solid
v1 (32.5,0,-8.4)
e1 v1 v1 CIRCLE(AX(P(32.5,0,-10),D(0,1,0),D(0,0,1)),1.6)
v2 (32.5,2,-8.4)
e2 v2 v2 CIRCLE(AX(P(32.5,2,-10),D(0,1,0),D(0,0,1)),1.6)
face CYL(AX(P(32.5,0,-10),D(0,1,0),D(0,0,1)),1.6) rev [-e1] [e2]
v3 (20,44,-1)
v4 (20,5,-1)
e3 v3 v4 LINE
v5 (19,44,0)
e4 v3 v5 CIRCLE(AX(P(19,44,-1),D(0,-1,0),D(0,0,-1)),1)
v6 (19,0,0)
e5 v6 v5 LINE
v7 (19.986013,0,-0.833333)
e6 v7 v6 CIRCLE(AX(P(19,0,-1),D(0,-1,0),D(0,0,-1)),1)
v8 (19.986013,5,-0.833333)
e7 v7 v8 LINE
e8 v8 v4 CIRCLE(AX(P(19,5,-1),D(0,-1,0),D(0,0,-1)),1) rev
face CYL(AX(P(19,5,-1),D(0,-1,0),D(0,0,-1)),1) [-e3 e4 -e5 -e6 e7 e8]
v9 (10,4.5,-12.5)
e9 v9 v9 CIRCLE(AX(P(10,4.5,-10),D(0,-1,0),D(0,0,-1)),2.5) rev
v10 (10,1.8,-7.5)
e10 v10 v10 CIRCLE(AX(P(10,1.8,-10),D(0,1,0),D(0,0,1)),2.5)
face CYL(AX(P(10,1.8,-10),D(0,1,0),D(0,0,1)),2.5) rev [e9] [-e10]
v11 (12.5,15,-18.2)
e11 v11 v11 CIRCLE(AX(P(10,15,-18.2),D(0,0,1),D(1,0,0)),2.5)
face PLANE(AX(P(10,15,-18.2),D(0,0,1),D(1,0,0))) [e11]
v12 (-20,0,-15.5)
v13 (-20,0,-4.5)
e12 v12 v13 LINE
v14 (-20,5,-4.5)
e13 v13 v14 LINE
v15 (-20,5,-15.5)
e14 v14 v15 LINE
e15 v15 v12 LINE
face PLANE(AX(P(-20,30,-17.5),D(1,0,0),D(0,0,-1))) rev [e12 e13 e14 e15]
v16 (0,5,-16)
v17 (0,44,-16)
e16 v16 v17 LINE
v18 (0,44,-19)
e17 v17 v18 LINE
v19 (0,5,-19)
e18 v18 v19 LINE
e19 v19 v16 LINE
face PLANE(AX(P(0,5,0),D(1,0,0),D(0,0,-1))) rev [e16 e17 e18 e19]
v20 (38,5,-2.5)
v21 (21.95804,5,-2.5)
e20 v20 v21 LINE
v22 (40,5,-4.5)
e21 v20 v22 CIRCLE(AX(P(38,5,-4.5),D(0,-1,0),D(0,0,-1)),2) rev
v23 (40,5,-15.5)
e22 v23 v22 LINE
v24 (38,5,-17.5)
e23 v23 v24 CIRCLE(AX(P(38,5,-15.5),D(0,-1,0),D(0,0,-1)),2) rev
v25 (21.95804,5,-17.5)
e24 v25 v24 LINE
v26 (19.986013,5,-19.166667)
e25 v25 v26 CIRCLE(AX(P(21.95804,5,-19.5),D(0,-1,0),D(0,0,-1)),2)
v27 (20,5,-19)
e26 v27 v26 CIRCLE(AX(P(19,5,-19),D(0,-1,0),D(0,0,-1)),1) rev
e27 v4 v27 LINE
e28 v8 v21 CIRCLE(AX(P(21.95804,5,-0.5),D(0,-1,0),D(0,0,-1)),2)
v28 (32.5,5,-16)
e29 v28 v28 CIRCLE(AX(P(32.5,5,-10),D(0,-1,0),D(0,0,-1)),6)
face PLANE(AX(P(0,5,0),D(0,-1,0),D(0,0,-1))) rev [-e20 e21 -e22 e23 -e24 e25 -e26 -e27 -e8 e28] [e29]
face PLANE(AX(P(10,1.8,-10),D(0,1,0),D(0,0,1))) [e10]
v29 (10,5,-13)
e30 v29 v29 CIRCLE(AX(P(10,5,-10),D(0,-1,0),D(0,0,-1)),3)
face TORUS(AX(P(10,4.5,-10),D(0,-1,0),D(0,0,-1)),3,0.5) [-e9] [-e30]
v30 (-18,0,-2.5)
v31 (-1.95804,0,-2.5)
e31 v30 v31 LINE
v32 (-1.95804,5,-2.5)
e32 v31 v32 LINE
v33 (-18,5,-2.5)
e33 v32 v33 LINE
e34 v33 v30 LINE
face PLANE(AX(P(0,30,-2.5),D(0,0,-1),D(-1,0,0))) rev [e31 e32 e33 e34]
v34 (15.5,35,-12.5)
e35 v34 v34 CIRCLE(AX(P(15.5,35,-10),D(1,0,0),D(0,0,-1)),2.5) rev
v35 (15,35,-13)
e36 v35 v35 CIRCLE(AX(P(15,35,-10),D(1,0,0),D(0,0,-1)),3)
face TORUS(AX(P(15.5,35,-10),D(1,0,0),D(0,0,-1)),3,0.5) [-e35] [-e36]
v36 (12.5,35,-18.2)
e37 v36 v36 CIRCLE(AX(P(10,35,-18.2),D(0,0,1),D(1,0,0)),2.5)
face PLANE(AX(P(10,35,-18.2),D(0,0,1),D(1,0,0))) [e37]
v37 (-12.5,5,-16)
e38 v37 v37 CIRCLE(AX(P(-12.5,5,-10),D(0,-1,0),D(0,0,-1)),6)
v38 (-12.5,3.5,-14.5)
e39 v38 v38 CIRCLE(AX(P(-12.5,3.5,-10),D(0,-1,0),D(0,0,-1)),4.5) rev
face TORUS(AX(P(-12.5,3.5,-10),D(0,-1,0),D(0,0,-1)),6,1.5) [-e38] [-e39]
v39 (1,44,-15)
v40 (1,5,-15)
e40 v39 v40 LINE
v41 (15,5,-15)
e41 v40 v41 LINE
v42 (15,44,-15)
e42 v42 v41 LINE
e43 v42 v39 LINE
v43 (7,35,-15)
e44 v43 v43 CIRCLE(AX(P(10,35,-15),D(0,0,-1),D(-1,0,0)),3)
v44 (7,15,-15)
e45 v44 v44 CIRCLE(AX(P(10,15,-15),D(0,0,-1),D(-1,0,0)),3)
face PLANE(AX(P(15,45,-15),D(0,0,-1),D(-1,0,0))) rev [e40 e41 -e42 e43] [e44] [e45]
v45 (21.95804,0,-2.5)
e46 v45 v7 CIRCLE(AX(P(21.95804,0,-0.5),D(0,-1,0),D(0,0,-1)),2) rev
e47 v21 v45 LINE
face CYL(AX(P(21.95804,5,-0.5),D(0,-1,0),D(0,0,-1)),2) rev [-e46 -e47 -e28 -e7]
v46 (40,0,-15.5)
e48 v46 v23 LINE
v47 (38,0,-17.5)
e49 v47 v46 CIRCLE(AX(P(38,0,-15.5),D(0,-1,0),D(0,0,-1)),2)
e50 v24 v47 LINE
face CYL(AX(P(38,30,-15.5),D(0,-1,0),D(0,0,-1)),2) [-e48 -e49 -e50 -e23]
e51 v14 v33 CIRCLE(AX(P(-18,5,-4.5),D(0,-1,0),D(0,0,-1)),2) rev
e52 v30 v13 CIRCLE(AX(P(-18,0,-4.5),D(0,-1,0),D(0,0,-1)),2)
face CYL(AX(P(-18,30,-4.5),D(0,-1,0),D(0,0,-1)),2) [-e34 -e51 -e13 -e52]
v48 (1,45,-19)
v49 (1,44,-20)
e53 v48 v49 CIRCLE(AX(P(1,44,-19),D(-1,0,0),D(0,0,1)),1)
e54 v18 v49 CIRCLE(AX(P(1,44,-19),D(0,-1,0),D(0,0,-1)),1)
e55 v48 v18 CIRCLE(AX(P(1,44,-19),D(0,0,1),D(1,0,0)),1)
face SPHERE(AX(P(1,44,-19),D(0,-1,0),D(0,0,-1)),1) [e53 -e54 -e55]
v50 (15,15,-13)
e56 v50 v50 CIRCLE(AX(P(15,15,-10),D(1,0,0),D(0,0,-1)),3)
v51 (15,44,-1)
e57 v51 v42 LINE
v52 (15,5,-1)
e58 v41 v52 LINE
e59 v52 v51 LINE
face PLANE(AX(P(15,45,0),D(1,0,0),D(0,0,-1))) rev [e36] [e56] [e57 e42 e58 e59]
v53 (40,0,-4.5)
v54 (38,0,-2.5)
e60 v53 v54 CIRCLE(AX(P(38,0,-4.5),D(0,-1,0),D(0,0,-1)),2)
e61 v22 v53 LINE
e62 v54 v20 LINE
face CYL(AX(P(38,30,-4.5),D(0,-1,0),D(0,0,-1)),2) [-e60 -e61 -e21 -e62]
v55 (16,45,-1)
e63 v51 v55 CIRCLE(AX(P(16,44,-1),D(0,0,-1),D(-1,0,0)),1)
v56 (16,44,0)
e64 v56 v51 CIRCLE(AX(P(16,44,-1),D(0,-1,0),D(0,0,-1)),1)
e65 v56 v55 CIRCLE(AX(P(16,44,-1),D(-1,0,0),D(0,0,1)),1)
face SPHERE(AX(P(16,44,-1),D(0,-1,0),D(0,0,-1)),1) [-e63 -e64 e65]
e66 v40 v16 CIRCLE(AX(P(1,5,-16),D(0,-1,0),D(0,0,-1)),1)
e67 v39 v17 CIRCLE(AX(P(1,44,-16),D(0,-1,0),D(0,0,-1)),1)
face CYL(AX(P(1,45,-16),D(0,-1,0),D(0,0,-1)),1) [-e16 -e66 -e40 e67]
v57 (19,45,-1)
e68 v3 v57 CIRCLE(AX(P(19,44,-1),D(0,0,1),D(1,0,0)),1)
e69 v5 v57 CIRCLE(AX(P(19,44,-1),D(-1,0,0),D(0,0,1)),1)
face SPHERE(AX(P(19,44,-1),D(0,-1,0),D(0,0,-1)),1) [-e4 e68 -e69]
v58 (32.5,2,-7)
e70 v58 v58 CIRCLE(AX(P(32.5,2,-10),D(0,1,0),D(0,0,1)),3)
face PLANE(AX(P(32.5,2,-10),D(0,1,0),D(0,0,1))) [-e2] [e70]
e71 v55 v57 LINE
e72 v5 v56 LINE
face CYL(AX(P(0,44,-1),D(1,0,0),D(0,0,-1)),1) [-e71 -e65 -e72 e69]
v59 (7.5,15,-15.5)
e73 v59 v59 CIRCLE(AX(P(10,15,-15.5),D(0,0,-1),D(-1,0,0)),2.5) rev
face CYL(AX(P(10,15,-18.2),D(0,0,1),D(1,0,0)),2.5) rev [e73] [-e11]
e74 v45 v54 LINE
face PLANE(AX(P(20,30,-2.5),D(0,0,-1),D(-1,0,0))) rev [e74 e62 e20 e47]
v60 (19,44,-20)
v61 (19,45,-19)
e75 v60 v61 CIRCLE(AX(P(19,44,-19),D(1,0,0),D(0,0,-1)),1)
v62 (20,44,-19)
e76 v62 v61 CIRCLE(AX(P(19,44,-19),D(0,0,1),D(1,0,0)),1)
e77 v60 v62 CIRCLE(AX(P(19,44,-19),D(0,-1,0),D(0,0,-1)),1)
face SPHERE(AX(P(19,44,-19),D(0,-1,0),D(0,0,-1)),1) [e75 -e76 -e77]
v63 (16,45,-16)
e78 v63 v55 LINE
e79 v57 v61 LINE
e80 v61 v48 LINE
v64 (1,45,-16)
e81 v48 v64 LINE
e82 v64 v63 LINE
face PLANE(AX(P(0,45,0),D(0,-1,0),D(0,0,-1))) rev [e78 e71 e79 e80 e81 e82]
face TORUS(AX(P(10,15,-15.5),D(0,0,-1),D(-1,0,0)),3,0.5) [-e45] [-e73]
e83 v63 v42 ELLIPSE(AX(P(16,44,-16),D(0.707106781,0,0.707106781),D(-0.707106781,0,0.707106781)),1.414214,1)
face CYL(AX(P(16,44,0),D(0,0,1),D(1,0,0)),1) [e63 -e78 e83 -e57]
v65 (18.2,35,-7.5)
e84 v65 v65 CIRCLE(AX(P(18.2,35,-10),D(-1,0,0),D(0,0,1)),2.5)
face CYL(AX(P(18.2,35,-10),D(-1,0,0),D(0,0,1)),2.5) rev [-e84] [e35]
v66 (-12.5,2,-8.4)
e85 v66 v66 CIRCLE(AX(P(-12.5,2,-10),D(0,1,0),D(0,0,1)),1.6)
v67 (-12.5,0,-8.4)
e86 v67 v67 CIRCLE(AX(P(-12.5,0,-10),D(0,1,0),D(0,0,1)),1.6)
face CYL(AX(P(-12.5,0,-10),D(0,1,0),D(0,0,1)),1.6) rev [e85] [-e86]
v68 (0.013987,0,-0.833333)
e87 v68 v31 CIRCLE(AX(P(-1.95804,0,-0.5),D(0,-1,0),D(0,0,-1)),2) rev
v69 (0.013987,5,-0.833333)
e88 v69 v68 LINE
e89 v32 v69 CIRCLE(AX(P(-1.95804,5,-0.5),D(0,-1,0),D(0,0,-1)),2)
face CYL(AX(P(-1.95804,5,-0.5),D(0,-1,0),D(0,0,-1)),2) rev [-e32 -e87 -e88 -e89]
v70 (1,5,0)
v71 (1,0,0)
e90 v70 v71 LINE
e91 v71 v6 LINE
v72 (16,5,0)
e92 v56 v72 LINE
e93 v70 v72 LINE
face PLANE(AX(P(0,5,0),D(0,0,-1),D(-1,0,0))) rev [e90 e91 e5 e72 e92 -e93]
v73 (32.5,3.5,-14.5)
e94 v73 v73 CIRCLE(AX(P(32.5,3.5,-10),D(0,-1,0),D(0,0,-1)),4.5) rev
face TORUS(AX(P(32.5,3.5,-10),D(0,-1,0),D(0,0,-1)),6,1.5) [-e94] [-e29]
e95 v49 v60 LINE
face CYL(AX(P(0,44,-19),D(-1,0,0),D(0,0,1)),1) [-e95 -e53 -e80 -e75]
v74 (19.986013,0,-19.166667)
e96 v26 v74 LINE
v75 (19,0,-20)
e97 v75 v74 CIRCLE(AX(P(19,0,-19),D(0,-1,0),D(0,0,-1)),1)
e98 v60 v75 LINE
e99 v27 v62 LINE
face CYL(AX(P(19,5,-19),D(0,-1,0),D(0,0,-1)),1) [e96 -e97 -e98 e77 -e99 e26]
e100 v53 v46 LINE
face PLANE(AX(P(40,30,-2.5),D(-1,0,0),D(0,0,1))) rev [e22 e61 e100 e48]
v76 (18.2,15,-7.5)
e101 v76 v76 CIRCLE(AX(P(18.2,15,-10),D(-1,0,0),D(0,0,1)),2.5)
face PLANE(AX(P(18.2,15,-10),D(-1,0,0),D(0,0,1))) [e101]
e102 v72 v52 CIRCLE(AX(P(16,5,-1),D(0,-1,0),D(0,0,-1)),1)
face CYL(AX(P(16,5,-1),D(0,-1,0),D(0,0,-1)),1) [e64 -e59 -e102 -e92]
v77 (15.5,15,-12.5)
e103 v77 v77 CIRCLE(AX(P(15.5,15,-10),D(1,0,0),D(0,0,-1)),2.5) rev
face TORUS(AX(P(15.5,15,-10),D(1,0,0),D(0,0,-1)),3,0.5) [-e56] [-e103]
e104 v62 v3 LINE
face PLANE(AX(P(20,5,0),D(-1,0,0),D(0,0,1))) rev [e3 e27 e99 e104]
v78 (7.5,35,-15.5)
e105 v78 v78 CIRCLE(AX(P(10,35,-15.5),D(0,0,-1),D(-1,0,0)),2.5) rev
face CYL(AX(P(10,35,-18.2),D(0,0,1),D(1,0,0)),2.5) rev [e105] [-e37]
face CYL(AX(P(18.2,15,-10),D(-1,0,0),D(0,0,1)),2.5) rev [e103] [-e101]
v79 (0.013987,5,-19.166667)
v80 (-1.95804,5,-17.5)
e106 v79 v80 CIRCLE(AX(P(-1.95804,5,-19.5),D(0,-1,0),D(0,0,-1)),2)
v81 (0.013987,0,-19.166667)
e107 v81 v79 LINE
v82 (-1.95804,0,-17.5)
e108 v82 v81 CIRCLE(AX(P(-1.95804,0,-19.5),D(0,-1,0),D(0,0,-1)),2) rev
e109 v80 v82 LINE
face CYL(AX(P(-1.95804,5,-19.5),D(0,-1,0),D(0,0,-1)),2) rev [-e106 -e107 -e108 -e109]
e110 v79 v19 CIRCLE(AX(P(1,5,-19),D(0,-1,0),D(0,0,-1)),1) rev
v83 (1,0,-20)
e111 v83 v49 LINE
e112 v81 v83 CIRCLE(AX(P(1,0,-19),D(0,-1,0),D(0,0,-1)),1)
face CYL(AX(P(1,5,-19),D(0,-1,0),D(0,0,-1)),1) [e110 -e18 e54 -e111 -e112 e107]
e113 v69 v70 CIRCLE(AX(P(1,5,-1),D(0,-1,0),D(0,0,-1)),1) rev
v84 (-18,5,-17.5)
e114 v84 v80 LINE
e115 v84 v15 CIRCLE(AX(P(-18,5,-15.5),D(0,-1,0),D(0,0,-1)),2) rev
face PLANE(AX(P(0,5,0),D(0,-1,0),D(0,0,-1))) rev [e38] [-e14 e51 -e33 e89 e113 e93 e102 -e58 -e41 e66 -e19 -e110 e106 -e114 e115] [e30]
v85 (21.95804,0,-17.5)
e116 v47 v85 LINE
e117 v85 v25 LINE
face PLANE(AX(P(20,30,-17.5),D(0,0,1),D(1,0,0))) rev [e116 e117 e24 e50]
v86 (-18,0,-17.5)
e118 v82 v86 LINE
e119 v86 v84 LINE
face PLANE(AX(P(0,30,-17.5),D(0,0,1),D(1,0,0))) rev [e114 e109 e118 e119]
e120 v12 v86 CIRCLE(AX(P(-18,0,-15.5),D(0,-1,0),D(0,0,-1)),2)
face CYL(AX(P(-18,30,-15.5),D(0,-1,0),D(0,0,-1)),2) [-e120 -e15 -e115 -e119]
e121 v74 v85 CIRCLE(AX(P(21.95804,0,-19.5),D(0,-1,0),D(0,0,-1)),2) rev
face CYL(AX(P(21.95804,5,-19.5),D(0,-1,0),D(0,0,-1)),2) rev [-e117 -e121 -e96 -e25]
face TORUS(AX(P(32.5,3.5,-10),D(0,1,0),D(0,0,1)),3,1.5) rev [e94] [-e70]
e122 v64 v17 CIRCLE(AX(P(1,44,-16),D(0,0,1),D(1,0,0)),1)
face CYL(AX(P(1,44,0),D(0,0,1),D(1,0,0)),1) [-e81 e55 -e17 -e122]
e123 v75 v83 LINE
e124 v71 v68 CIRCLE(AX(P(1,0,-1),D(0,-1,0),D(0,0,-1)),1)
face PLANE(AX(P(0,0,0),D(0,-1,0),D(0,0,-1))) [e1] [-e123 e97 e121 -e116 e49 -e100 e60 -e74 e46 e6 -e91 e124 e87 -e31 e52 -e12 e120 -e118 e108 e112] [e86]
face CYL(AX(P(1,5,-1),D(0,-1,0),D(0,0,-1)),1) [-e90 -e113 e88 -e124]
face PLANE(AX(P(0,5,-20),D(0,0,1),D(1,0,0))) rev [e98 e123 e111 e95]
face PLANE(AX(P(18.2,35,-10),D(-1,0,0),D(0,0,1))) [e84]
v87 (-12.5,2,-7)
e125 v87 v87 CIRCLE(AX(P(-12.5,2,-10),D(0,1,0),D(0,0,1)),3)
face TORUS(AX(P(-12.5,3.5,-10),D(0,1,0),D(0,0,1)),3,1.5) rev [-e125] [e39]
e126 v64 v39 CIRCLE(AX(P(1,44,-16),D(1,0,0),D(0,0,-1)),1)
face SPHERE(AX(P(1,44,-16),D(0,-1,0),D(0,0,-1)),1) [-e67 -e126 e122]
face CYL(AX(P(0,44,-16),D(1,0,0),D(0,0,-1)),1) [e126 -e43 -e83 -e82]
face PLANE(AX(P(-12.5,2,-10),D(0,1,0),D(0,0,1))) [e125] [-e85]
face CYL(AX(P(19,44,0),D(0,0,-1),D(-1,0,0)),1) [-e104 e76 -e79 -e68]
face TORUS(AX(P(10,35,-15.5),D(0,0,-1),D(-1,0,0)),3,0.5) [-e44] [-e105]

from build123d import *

# Parameters (mm, degrees)
SKETCH1_W           = 20
SKETCH1_H           = 20
BOSS_EXTRUDE1_DEPTH = 5
BOSS_EXTRUDE2_DEPTH = 40
FILLET1_R           = 1
FILLET2_R           = 1
SKETCH3_R           = 2.5
CUT_EXTRUDE1_DEPTH  = 3.2
SKETCH4_R           = 2.5
CUT_EXTRUDE2_DEPTH  = 3.2
SKETCH5_R           = 2.5
CUT_EXTRUDE3_DEPTH  = 3.2
FILLET3_R           = 0.5
FILLET4_R           = 1
SKETCH6_W           = 20
SKETCH6_H           = 15
BOSS_EXTRUDE3_DEPTH = 5
FILLET5_R           = 2
FILLET6_R           = 2
SKETCH7_R           = 4.5
CUT_EXTRUDE4_DEPTH  = 3
FILLET7_R           = 1.5
SKETCH8_R           = 1.6
CUT_EXTRUDE5_DEPTH  = 63.040309477


# Some blends are built 0.0001 mm under size
with BuildPart() as part:
    # Sketch1 → Boss-Extrude1 (new body)
    with BuildSketch(Plane(origin=(0, 0, 0), x_dir=(1, 0, 0), z_dir=(0, 1, 0))):
        with Locations((10, 10)):
            Rectangle(SKETCH1_W, SKETCH1_H)
    extrude(amount=BOSS_EXTRUDE1_DEPTH)

    # Sketch2 → Boss-Extrude2 (add)
    with BuildSketch(Plane(origin=(0, 5, 0), x_dir=(1, 0, 0), z_dir=(0, 1, 0))):
        Polygon((0, 20), (20, 20), (20, 0), (15, 0), (15, 15), (0, 15), align=None)
    extrude(amount=BOSS_EXTRUDE2_DEPTH)

    # Fillet1
    fillet1_edges = [part.edges().sort_by_distance(p)[0] for p in [
        (0, 25, -15),
        (15, 25, 0),
        (0, 2.5, 0),
    ]]
    fillet(fillet1_edges, radius=FILLET1_R)

    # Fillet2
    fillet2_edges = [part.edges().sort_by_distance(p)[0] for p in [
        (0, 22.5, -20),
        (20, 22.5, -20),
        (20, 22.5, 0),
    ]]
    fillet(fillet2_edges, radius=FILLET2_R)

    # Sketch3 → Cut-Extrude1 (cut)
    with BuildSketch(Plane(origin=(0, 5, 0), x_dir=(1, 0, 0), z_dir=(0, 1, 0))):
        with Locations(Location((10, 10, 0), (0, 0, 270))):
            Circle(SKETCH3_R)
    extrude(amount=-CUT_EXTRUDE1_DEPTH, mode=Mode.SUBTRACT)

    # Sketch4 → Cut-Extrude2 (cut)
    with BuildSketch(Plane.XY.offset(-15)):
        with Locations((10, 15)):
            Circle(SKETCH4_R)
        with Locations((10, 35)):
            Circle(SKETCH4_R)
    extrude(amount=-CUT_EXTRUDE2_DEPTH, mode=Mode.SUBTRACT)

    # Sketch5 → Cut-Extrude3 (cut)
    with BuildSketch(Plane.ZY.offset(-15)):
        with Locations((-10, 15)):
            Circle(SKETCH5_R)
        with Locations((-10, 35)):
            Circle(SKETCH5_R)
    extrude(amount=-CUT_EXTRUDE3_DEPTH, mode=Mode.SUBTRACT)

    # Fillet3
    fillet3_edges = [part.edges().sort_by_distance(p)[0] for p in [
        (10, 5, -12.5),
        (7.5, 15, -15),
        (7.5, 35, -15),
        (15, 15, -12.5),
        (15, 35, -12.5),
    ]]
    fillet(fillet3_edges, radius=FILLET3_R)

    # Fillet4
    fillet4_edges = [part.edges().sort_by_distance(p)[0] for p in [
        (15, 45, -8),
        (8, 45, -15),
        (17.5, 45, 0),
        (15.292893219, 45, -0.292893219),
        (0.292893219, 45, -15.292893219),
        (10, 45, -20),
        (20, 45, -10),
        (0, 45, -17.5),
        (19.707106781, 45, -0.292893219),
        (0.292893219, 45, -19.707106781),
        (19.707106781, 45, -19.707106781),
    ]]
    fillet(fillet4_edges, radius=FILLET4_R)

    # Sketch6 → Boss-Extrude3 (add)
    with BuildSketch(Plane(origin=(0, 0, 0), x_dir=(1, 0, 0), z_dir=(0, 1, 0))):
        with Locations((-10, 10)):
            Rectangle(SKETCH6_W, SKETCH6_H)
        with Locations((30, 10)):
            Rectangle(SKETCH6_W, SKETCH6_H)
    extrude(amount=BOSS_EXTRUDE3_DEPTH)

    # Fillet5
    # the kernel refuses this fillet: 2 mm, written as the material it adds along each edge
    with BuildSketch(Plane(origin=(0, 0, -17.5), x_dir=(0.00839172619726849, 0, -0.9999647888458023), z_dir=(0, 1, 0)), Plane(origin=(20, 0, -2.5), x_dir=(-0.008391726197268362, 0, 0.9999647888458023), z_dir=(0, 1, 0))) as fillet5_piece_1:
        with BuildLine():
            CenterArc((1.983498243, 1.974754399), FILLET5_R, 180.480816137, 80.405931773)
            Line((-0.016431335, 1.957970947), (-0.216424292, 1.956292601))
            Line((-0.216424292, 1.956292601), (-0.199992958, -0.001678345))
            Line((-0.199992958, -0.001678345), (0.001678345, -0.199992958))
            ThreePointArc((0.001678345, -0.199992958), (1.501625529, -0.187405368), (1.635048065, -0.19747544))
            Line((1.635048065, -0.19747544), (1.666725354, 0))
        make_face()
    extrude(amount=5)
    with BuildSketch(Plane(origin=(0, 0, -2.5), x_dir=(0.00839172619726729, 0, 0.9999647888458023), z_dir=(0, 1, 0)), Plane(origin=(20, 0, -17.5), x_dir=(-0.008391726197268357, 0, -0.9999647888458023), z_dir=(0, 1, 0))) as fillet5_piece_2:
        with BuildLine():
            CenterArc((1.983498243, -1.974754399), FILLET5_R, 99.11325209, 80.405931773)
            Line((-0.016431335, -1.957970947), (-0.216424292, -1.956292601))
            Line((-0.216424292, -1.956292601), (-0.199992958, 0.001678345))
            Line((-0.199992958, 0.001678345), (0.001678345, 0.199992958))
            ThreePointArc((0.001678345, 0.199992958), (1.501625529, 0.187405368), (1.635048065, 0.19747544))
            Line((1.635048065, 0.19747544), (1.666725354, 0))
        make_face()
    extrude(amount=5)

    # Fillet6
    fillet6_edges = [part.edges().sort_by_distance(p)[0] for p in [
        (-20, 2.5, -2.5),
        (-20, 2.5, -17.5),
        (40, 2.5, -17.5),
        (40, 2.5, -2.5),
    ]]
    fillet(fillet6_edges, radius=FILLET6_R)

    # Sketch7 → Cut-Extrude4 (cut)
    with BuildSketch(Plane(origin=(0, 5, 0), x_dir=(1, 0, 0), z_dir=(0, 1, 0))):
        with Locations(Location((-12.5, 10, 0), (0, 0, 270))):
            Circle(SKETCH7_R)
        with Locations(Location((32.5, 10, 0), (0, 0, 270))):
            Circle(SKETCH7_R)
    extrude(amount=-CUT_EXTRUDE4_DEPTH, mode=Mode.SUBTRACT)

    # Fillet7
    fillet7_edges = [part.edges().sort_by_distance(p)[0] for p in [
        (-12.5, 2, -14.5),
        (-12.5, 5, -14.5),
        (32.5, 2, -14.5),
        (32.5, 5, -14.5),
    ]]
    fillet(fillet7_edges, radius=FILLET7_R - 0.0001)  # a hair under: the kernel refuses the full size

    # Sketch8 → Cut-Extrude5 (cut, through all)
    with BuildSketch(Plane(origin=(0, 2, 0), x_dir=(1, 0, 0), z_dir=(0, 1, 0))):
        with Locations(Location((-12.5, 10, 0), (0, 0, 270))):
            Circle(SKETCH8_R)
        with Locations(Location((32.5, 10, 0), (0, 0, 270))):
            Circle(SKETCH8_R)
    extrude(amount=-CUT_EXTRUDE5_DEPTH, mode=Mode.SUBTRACT)


solid = part.part
